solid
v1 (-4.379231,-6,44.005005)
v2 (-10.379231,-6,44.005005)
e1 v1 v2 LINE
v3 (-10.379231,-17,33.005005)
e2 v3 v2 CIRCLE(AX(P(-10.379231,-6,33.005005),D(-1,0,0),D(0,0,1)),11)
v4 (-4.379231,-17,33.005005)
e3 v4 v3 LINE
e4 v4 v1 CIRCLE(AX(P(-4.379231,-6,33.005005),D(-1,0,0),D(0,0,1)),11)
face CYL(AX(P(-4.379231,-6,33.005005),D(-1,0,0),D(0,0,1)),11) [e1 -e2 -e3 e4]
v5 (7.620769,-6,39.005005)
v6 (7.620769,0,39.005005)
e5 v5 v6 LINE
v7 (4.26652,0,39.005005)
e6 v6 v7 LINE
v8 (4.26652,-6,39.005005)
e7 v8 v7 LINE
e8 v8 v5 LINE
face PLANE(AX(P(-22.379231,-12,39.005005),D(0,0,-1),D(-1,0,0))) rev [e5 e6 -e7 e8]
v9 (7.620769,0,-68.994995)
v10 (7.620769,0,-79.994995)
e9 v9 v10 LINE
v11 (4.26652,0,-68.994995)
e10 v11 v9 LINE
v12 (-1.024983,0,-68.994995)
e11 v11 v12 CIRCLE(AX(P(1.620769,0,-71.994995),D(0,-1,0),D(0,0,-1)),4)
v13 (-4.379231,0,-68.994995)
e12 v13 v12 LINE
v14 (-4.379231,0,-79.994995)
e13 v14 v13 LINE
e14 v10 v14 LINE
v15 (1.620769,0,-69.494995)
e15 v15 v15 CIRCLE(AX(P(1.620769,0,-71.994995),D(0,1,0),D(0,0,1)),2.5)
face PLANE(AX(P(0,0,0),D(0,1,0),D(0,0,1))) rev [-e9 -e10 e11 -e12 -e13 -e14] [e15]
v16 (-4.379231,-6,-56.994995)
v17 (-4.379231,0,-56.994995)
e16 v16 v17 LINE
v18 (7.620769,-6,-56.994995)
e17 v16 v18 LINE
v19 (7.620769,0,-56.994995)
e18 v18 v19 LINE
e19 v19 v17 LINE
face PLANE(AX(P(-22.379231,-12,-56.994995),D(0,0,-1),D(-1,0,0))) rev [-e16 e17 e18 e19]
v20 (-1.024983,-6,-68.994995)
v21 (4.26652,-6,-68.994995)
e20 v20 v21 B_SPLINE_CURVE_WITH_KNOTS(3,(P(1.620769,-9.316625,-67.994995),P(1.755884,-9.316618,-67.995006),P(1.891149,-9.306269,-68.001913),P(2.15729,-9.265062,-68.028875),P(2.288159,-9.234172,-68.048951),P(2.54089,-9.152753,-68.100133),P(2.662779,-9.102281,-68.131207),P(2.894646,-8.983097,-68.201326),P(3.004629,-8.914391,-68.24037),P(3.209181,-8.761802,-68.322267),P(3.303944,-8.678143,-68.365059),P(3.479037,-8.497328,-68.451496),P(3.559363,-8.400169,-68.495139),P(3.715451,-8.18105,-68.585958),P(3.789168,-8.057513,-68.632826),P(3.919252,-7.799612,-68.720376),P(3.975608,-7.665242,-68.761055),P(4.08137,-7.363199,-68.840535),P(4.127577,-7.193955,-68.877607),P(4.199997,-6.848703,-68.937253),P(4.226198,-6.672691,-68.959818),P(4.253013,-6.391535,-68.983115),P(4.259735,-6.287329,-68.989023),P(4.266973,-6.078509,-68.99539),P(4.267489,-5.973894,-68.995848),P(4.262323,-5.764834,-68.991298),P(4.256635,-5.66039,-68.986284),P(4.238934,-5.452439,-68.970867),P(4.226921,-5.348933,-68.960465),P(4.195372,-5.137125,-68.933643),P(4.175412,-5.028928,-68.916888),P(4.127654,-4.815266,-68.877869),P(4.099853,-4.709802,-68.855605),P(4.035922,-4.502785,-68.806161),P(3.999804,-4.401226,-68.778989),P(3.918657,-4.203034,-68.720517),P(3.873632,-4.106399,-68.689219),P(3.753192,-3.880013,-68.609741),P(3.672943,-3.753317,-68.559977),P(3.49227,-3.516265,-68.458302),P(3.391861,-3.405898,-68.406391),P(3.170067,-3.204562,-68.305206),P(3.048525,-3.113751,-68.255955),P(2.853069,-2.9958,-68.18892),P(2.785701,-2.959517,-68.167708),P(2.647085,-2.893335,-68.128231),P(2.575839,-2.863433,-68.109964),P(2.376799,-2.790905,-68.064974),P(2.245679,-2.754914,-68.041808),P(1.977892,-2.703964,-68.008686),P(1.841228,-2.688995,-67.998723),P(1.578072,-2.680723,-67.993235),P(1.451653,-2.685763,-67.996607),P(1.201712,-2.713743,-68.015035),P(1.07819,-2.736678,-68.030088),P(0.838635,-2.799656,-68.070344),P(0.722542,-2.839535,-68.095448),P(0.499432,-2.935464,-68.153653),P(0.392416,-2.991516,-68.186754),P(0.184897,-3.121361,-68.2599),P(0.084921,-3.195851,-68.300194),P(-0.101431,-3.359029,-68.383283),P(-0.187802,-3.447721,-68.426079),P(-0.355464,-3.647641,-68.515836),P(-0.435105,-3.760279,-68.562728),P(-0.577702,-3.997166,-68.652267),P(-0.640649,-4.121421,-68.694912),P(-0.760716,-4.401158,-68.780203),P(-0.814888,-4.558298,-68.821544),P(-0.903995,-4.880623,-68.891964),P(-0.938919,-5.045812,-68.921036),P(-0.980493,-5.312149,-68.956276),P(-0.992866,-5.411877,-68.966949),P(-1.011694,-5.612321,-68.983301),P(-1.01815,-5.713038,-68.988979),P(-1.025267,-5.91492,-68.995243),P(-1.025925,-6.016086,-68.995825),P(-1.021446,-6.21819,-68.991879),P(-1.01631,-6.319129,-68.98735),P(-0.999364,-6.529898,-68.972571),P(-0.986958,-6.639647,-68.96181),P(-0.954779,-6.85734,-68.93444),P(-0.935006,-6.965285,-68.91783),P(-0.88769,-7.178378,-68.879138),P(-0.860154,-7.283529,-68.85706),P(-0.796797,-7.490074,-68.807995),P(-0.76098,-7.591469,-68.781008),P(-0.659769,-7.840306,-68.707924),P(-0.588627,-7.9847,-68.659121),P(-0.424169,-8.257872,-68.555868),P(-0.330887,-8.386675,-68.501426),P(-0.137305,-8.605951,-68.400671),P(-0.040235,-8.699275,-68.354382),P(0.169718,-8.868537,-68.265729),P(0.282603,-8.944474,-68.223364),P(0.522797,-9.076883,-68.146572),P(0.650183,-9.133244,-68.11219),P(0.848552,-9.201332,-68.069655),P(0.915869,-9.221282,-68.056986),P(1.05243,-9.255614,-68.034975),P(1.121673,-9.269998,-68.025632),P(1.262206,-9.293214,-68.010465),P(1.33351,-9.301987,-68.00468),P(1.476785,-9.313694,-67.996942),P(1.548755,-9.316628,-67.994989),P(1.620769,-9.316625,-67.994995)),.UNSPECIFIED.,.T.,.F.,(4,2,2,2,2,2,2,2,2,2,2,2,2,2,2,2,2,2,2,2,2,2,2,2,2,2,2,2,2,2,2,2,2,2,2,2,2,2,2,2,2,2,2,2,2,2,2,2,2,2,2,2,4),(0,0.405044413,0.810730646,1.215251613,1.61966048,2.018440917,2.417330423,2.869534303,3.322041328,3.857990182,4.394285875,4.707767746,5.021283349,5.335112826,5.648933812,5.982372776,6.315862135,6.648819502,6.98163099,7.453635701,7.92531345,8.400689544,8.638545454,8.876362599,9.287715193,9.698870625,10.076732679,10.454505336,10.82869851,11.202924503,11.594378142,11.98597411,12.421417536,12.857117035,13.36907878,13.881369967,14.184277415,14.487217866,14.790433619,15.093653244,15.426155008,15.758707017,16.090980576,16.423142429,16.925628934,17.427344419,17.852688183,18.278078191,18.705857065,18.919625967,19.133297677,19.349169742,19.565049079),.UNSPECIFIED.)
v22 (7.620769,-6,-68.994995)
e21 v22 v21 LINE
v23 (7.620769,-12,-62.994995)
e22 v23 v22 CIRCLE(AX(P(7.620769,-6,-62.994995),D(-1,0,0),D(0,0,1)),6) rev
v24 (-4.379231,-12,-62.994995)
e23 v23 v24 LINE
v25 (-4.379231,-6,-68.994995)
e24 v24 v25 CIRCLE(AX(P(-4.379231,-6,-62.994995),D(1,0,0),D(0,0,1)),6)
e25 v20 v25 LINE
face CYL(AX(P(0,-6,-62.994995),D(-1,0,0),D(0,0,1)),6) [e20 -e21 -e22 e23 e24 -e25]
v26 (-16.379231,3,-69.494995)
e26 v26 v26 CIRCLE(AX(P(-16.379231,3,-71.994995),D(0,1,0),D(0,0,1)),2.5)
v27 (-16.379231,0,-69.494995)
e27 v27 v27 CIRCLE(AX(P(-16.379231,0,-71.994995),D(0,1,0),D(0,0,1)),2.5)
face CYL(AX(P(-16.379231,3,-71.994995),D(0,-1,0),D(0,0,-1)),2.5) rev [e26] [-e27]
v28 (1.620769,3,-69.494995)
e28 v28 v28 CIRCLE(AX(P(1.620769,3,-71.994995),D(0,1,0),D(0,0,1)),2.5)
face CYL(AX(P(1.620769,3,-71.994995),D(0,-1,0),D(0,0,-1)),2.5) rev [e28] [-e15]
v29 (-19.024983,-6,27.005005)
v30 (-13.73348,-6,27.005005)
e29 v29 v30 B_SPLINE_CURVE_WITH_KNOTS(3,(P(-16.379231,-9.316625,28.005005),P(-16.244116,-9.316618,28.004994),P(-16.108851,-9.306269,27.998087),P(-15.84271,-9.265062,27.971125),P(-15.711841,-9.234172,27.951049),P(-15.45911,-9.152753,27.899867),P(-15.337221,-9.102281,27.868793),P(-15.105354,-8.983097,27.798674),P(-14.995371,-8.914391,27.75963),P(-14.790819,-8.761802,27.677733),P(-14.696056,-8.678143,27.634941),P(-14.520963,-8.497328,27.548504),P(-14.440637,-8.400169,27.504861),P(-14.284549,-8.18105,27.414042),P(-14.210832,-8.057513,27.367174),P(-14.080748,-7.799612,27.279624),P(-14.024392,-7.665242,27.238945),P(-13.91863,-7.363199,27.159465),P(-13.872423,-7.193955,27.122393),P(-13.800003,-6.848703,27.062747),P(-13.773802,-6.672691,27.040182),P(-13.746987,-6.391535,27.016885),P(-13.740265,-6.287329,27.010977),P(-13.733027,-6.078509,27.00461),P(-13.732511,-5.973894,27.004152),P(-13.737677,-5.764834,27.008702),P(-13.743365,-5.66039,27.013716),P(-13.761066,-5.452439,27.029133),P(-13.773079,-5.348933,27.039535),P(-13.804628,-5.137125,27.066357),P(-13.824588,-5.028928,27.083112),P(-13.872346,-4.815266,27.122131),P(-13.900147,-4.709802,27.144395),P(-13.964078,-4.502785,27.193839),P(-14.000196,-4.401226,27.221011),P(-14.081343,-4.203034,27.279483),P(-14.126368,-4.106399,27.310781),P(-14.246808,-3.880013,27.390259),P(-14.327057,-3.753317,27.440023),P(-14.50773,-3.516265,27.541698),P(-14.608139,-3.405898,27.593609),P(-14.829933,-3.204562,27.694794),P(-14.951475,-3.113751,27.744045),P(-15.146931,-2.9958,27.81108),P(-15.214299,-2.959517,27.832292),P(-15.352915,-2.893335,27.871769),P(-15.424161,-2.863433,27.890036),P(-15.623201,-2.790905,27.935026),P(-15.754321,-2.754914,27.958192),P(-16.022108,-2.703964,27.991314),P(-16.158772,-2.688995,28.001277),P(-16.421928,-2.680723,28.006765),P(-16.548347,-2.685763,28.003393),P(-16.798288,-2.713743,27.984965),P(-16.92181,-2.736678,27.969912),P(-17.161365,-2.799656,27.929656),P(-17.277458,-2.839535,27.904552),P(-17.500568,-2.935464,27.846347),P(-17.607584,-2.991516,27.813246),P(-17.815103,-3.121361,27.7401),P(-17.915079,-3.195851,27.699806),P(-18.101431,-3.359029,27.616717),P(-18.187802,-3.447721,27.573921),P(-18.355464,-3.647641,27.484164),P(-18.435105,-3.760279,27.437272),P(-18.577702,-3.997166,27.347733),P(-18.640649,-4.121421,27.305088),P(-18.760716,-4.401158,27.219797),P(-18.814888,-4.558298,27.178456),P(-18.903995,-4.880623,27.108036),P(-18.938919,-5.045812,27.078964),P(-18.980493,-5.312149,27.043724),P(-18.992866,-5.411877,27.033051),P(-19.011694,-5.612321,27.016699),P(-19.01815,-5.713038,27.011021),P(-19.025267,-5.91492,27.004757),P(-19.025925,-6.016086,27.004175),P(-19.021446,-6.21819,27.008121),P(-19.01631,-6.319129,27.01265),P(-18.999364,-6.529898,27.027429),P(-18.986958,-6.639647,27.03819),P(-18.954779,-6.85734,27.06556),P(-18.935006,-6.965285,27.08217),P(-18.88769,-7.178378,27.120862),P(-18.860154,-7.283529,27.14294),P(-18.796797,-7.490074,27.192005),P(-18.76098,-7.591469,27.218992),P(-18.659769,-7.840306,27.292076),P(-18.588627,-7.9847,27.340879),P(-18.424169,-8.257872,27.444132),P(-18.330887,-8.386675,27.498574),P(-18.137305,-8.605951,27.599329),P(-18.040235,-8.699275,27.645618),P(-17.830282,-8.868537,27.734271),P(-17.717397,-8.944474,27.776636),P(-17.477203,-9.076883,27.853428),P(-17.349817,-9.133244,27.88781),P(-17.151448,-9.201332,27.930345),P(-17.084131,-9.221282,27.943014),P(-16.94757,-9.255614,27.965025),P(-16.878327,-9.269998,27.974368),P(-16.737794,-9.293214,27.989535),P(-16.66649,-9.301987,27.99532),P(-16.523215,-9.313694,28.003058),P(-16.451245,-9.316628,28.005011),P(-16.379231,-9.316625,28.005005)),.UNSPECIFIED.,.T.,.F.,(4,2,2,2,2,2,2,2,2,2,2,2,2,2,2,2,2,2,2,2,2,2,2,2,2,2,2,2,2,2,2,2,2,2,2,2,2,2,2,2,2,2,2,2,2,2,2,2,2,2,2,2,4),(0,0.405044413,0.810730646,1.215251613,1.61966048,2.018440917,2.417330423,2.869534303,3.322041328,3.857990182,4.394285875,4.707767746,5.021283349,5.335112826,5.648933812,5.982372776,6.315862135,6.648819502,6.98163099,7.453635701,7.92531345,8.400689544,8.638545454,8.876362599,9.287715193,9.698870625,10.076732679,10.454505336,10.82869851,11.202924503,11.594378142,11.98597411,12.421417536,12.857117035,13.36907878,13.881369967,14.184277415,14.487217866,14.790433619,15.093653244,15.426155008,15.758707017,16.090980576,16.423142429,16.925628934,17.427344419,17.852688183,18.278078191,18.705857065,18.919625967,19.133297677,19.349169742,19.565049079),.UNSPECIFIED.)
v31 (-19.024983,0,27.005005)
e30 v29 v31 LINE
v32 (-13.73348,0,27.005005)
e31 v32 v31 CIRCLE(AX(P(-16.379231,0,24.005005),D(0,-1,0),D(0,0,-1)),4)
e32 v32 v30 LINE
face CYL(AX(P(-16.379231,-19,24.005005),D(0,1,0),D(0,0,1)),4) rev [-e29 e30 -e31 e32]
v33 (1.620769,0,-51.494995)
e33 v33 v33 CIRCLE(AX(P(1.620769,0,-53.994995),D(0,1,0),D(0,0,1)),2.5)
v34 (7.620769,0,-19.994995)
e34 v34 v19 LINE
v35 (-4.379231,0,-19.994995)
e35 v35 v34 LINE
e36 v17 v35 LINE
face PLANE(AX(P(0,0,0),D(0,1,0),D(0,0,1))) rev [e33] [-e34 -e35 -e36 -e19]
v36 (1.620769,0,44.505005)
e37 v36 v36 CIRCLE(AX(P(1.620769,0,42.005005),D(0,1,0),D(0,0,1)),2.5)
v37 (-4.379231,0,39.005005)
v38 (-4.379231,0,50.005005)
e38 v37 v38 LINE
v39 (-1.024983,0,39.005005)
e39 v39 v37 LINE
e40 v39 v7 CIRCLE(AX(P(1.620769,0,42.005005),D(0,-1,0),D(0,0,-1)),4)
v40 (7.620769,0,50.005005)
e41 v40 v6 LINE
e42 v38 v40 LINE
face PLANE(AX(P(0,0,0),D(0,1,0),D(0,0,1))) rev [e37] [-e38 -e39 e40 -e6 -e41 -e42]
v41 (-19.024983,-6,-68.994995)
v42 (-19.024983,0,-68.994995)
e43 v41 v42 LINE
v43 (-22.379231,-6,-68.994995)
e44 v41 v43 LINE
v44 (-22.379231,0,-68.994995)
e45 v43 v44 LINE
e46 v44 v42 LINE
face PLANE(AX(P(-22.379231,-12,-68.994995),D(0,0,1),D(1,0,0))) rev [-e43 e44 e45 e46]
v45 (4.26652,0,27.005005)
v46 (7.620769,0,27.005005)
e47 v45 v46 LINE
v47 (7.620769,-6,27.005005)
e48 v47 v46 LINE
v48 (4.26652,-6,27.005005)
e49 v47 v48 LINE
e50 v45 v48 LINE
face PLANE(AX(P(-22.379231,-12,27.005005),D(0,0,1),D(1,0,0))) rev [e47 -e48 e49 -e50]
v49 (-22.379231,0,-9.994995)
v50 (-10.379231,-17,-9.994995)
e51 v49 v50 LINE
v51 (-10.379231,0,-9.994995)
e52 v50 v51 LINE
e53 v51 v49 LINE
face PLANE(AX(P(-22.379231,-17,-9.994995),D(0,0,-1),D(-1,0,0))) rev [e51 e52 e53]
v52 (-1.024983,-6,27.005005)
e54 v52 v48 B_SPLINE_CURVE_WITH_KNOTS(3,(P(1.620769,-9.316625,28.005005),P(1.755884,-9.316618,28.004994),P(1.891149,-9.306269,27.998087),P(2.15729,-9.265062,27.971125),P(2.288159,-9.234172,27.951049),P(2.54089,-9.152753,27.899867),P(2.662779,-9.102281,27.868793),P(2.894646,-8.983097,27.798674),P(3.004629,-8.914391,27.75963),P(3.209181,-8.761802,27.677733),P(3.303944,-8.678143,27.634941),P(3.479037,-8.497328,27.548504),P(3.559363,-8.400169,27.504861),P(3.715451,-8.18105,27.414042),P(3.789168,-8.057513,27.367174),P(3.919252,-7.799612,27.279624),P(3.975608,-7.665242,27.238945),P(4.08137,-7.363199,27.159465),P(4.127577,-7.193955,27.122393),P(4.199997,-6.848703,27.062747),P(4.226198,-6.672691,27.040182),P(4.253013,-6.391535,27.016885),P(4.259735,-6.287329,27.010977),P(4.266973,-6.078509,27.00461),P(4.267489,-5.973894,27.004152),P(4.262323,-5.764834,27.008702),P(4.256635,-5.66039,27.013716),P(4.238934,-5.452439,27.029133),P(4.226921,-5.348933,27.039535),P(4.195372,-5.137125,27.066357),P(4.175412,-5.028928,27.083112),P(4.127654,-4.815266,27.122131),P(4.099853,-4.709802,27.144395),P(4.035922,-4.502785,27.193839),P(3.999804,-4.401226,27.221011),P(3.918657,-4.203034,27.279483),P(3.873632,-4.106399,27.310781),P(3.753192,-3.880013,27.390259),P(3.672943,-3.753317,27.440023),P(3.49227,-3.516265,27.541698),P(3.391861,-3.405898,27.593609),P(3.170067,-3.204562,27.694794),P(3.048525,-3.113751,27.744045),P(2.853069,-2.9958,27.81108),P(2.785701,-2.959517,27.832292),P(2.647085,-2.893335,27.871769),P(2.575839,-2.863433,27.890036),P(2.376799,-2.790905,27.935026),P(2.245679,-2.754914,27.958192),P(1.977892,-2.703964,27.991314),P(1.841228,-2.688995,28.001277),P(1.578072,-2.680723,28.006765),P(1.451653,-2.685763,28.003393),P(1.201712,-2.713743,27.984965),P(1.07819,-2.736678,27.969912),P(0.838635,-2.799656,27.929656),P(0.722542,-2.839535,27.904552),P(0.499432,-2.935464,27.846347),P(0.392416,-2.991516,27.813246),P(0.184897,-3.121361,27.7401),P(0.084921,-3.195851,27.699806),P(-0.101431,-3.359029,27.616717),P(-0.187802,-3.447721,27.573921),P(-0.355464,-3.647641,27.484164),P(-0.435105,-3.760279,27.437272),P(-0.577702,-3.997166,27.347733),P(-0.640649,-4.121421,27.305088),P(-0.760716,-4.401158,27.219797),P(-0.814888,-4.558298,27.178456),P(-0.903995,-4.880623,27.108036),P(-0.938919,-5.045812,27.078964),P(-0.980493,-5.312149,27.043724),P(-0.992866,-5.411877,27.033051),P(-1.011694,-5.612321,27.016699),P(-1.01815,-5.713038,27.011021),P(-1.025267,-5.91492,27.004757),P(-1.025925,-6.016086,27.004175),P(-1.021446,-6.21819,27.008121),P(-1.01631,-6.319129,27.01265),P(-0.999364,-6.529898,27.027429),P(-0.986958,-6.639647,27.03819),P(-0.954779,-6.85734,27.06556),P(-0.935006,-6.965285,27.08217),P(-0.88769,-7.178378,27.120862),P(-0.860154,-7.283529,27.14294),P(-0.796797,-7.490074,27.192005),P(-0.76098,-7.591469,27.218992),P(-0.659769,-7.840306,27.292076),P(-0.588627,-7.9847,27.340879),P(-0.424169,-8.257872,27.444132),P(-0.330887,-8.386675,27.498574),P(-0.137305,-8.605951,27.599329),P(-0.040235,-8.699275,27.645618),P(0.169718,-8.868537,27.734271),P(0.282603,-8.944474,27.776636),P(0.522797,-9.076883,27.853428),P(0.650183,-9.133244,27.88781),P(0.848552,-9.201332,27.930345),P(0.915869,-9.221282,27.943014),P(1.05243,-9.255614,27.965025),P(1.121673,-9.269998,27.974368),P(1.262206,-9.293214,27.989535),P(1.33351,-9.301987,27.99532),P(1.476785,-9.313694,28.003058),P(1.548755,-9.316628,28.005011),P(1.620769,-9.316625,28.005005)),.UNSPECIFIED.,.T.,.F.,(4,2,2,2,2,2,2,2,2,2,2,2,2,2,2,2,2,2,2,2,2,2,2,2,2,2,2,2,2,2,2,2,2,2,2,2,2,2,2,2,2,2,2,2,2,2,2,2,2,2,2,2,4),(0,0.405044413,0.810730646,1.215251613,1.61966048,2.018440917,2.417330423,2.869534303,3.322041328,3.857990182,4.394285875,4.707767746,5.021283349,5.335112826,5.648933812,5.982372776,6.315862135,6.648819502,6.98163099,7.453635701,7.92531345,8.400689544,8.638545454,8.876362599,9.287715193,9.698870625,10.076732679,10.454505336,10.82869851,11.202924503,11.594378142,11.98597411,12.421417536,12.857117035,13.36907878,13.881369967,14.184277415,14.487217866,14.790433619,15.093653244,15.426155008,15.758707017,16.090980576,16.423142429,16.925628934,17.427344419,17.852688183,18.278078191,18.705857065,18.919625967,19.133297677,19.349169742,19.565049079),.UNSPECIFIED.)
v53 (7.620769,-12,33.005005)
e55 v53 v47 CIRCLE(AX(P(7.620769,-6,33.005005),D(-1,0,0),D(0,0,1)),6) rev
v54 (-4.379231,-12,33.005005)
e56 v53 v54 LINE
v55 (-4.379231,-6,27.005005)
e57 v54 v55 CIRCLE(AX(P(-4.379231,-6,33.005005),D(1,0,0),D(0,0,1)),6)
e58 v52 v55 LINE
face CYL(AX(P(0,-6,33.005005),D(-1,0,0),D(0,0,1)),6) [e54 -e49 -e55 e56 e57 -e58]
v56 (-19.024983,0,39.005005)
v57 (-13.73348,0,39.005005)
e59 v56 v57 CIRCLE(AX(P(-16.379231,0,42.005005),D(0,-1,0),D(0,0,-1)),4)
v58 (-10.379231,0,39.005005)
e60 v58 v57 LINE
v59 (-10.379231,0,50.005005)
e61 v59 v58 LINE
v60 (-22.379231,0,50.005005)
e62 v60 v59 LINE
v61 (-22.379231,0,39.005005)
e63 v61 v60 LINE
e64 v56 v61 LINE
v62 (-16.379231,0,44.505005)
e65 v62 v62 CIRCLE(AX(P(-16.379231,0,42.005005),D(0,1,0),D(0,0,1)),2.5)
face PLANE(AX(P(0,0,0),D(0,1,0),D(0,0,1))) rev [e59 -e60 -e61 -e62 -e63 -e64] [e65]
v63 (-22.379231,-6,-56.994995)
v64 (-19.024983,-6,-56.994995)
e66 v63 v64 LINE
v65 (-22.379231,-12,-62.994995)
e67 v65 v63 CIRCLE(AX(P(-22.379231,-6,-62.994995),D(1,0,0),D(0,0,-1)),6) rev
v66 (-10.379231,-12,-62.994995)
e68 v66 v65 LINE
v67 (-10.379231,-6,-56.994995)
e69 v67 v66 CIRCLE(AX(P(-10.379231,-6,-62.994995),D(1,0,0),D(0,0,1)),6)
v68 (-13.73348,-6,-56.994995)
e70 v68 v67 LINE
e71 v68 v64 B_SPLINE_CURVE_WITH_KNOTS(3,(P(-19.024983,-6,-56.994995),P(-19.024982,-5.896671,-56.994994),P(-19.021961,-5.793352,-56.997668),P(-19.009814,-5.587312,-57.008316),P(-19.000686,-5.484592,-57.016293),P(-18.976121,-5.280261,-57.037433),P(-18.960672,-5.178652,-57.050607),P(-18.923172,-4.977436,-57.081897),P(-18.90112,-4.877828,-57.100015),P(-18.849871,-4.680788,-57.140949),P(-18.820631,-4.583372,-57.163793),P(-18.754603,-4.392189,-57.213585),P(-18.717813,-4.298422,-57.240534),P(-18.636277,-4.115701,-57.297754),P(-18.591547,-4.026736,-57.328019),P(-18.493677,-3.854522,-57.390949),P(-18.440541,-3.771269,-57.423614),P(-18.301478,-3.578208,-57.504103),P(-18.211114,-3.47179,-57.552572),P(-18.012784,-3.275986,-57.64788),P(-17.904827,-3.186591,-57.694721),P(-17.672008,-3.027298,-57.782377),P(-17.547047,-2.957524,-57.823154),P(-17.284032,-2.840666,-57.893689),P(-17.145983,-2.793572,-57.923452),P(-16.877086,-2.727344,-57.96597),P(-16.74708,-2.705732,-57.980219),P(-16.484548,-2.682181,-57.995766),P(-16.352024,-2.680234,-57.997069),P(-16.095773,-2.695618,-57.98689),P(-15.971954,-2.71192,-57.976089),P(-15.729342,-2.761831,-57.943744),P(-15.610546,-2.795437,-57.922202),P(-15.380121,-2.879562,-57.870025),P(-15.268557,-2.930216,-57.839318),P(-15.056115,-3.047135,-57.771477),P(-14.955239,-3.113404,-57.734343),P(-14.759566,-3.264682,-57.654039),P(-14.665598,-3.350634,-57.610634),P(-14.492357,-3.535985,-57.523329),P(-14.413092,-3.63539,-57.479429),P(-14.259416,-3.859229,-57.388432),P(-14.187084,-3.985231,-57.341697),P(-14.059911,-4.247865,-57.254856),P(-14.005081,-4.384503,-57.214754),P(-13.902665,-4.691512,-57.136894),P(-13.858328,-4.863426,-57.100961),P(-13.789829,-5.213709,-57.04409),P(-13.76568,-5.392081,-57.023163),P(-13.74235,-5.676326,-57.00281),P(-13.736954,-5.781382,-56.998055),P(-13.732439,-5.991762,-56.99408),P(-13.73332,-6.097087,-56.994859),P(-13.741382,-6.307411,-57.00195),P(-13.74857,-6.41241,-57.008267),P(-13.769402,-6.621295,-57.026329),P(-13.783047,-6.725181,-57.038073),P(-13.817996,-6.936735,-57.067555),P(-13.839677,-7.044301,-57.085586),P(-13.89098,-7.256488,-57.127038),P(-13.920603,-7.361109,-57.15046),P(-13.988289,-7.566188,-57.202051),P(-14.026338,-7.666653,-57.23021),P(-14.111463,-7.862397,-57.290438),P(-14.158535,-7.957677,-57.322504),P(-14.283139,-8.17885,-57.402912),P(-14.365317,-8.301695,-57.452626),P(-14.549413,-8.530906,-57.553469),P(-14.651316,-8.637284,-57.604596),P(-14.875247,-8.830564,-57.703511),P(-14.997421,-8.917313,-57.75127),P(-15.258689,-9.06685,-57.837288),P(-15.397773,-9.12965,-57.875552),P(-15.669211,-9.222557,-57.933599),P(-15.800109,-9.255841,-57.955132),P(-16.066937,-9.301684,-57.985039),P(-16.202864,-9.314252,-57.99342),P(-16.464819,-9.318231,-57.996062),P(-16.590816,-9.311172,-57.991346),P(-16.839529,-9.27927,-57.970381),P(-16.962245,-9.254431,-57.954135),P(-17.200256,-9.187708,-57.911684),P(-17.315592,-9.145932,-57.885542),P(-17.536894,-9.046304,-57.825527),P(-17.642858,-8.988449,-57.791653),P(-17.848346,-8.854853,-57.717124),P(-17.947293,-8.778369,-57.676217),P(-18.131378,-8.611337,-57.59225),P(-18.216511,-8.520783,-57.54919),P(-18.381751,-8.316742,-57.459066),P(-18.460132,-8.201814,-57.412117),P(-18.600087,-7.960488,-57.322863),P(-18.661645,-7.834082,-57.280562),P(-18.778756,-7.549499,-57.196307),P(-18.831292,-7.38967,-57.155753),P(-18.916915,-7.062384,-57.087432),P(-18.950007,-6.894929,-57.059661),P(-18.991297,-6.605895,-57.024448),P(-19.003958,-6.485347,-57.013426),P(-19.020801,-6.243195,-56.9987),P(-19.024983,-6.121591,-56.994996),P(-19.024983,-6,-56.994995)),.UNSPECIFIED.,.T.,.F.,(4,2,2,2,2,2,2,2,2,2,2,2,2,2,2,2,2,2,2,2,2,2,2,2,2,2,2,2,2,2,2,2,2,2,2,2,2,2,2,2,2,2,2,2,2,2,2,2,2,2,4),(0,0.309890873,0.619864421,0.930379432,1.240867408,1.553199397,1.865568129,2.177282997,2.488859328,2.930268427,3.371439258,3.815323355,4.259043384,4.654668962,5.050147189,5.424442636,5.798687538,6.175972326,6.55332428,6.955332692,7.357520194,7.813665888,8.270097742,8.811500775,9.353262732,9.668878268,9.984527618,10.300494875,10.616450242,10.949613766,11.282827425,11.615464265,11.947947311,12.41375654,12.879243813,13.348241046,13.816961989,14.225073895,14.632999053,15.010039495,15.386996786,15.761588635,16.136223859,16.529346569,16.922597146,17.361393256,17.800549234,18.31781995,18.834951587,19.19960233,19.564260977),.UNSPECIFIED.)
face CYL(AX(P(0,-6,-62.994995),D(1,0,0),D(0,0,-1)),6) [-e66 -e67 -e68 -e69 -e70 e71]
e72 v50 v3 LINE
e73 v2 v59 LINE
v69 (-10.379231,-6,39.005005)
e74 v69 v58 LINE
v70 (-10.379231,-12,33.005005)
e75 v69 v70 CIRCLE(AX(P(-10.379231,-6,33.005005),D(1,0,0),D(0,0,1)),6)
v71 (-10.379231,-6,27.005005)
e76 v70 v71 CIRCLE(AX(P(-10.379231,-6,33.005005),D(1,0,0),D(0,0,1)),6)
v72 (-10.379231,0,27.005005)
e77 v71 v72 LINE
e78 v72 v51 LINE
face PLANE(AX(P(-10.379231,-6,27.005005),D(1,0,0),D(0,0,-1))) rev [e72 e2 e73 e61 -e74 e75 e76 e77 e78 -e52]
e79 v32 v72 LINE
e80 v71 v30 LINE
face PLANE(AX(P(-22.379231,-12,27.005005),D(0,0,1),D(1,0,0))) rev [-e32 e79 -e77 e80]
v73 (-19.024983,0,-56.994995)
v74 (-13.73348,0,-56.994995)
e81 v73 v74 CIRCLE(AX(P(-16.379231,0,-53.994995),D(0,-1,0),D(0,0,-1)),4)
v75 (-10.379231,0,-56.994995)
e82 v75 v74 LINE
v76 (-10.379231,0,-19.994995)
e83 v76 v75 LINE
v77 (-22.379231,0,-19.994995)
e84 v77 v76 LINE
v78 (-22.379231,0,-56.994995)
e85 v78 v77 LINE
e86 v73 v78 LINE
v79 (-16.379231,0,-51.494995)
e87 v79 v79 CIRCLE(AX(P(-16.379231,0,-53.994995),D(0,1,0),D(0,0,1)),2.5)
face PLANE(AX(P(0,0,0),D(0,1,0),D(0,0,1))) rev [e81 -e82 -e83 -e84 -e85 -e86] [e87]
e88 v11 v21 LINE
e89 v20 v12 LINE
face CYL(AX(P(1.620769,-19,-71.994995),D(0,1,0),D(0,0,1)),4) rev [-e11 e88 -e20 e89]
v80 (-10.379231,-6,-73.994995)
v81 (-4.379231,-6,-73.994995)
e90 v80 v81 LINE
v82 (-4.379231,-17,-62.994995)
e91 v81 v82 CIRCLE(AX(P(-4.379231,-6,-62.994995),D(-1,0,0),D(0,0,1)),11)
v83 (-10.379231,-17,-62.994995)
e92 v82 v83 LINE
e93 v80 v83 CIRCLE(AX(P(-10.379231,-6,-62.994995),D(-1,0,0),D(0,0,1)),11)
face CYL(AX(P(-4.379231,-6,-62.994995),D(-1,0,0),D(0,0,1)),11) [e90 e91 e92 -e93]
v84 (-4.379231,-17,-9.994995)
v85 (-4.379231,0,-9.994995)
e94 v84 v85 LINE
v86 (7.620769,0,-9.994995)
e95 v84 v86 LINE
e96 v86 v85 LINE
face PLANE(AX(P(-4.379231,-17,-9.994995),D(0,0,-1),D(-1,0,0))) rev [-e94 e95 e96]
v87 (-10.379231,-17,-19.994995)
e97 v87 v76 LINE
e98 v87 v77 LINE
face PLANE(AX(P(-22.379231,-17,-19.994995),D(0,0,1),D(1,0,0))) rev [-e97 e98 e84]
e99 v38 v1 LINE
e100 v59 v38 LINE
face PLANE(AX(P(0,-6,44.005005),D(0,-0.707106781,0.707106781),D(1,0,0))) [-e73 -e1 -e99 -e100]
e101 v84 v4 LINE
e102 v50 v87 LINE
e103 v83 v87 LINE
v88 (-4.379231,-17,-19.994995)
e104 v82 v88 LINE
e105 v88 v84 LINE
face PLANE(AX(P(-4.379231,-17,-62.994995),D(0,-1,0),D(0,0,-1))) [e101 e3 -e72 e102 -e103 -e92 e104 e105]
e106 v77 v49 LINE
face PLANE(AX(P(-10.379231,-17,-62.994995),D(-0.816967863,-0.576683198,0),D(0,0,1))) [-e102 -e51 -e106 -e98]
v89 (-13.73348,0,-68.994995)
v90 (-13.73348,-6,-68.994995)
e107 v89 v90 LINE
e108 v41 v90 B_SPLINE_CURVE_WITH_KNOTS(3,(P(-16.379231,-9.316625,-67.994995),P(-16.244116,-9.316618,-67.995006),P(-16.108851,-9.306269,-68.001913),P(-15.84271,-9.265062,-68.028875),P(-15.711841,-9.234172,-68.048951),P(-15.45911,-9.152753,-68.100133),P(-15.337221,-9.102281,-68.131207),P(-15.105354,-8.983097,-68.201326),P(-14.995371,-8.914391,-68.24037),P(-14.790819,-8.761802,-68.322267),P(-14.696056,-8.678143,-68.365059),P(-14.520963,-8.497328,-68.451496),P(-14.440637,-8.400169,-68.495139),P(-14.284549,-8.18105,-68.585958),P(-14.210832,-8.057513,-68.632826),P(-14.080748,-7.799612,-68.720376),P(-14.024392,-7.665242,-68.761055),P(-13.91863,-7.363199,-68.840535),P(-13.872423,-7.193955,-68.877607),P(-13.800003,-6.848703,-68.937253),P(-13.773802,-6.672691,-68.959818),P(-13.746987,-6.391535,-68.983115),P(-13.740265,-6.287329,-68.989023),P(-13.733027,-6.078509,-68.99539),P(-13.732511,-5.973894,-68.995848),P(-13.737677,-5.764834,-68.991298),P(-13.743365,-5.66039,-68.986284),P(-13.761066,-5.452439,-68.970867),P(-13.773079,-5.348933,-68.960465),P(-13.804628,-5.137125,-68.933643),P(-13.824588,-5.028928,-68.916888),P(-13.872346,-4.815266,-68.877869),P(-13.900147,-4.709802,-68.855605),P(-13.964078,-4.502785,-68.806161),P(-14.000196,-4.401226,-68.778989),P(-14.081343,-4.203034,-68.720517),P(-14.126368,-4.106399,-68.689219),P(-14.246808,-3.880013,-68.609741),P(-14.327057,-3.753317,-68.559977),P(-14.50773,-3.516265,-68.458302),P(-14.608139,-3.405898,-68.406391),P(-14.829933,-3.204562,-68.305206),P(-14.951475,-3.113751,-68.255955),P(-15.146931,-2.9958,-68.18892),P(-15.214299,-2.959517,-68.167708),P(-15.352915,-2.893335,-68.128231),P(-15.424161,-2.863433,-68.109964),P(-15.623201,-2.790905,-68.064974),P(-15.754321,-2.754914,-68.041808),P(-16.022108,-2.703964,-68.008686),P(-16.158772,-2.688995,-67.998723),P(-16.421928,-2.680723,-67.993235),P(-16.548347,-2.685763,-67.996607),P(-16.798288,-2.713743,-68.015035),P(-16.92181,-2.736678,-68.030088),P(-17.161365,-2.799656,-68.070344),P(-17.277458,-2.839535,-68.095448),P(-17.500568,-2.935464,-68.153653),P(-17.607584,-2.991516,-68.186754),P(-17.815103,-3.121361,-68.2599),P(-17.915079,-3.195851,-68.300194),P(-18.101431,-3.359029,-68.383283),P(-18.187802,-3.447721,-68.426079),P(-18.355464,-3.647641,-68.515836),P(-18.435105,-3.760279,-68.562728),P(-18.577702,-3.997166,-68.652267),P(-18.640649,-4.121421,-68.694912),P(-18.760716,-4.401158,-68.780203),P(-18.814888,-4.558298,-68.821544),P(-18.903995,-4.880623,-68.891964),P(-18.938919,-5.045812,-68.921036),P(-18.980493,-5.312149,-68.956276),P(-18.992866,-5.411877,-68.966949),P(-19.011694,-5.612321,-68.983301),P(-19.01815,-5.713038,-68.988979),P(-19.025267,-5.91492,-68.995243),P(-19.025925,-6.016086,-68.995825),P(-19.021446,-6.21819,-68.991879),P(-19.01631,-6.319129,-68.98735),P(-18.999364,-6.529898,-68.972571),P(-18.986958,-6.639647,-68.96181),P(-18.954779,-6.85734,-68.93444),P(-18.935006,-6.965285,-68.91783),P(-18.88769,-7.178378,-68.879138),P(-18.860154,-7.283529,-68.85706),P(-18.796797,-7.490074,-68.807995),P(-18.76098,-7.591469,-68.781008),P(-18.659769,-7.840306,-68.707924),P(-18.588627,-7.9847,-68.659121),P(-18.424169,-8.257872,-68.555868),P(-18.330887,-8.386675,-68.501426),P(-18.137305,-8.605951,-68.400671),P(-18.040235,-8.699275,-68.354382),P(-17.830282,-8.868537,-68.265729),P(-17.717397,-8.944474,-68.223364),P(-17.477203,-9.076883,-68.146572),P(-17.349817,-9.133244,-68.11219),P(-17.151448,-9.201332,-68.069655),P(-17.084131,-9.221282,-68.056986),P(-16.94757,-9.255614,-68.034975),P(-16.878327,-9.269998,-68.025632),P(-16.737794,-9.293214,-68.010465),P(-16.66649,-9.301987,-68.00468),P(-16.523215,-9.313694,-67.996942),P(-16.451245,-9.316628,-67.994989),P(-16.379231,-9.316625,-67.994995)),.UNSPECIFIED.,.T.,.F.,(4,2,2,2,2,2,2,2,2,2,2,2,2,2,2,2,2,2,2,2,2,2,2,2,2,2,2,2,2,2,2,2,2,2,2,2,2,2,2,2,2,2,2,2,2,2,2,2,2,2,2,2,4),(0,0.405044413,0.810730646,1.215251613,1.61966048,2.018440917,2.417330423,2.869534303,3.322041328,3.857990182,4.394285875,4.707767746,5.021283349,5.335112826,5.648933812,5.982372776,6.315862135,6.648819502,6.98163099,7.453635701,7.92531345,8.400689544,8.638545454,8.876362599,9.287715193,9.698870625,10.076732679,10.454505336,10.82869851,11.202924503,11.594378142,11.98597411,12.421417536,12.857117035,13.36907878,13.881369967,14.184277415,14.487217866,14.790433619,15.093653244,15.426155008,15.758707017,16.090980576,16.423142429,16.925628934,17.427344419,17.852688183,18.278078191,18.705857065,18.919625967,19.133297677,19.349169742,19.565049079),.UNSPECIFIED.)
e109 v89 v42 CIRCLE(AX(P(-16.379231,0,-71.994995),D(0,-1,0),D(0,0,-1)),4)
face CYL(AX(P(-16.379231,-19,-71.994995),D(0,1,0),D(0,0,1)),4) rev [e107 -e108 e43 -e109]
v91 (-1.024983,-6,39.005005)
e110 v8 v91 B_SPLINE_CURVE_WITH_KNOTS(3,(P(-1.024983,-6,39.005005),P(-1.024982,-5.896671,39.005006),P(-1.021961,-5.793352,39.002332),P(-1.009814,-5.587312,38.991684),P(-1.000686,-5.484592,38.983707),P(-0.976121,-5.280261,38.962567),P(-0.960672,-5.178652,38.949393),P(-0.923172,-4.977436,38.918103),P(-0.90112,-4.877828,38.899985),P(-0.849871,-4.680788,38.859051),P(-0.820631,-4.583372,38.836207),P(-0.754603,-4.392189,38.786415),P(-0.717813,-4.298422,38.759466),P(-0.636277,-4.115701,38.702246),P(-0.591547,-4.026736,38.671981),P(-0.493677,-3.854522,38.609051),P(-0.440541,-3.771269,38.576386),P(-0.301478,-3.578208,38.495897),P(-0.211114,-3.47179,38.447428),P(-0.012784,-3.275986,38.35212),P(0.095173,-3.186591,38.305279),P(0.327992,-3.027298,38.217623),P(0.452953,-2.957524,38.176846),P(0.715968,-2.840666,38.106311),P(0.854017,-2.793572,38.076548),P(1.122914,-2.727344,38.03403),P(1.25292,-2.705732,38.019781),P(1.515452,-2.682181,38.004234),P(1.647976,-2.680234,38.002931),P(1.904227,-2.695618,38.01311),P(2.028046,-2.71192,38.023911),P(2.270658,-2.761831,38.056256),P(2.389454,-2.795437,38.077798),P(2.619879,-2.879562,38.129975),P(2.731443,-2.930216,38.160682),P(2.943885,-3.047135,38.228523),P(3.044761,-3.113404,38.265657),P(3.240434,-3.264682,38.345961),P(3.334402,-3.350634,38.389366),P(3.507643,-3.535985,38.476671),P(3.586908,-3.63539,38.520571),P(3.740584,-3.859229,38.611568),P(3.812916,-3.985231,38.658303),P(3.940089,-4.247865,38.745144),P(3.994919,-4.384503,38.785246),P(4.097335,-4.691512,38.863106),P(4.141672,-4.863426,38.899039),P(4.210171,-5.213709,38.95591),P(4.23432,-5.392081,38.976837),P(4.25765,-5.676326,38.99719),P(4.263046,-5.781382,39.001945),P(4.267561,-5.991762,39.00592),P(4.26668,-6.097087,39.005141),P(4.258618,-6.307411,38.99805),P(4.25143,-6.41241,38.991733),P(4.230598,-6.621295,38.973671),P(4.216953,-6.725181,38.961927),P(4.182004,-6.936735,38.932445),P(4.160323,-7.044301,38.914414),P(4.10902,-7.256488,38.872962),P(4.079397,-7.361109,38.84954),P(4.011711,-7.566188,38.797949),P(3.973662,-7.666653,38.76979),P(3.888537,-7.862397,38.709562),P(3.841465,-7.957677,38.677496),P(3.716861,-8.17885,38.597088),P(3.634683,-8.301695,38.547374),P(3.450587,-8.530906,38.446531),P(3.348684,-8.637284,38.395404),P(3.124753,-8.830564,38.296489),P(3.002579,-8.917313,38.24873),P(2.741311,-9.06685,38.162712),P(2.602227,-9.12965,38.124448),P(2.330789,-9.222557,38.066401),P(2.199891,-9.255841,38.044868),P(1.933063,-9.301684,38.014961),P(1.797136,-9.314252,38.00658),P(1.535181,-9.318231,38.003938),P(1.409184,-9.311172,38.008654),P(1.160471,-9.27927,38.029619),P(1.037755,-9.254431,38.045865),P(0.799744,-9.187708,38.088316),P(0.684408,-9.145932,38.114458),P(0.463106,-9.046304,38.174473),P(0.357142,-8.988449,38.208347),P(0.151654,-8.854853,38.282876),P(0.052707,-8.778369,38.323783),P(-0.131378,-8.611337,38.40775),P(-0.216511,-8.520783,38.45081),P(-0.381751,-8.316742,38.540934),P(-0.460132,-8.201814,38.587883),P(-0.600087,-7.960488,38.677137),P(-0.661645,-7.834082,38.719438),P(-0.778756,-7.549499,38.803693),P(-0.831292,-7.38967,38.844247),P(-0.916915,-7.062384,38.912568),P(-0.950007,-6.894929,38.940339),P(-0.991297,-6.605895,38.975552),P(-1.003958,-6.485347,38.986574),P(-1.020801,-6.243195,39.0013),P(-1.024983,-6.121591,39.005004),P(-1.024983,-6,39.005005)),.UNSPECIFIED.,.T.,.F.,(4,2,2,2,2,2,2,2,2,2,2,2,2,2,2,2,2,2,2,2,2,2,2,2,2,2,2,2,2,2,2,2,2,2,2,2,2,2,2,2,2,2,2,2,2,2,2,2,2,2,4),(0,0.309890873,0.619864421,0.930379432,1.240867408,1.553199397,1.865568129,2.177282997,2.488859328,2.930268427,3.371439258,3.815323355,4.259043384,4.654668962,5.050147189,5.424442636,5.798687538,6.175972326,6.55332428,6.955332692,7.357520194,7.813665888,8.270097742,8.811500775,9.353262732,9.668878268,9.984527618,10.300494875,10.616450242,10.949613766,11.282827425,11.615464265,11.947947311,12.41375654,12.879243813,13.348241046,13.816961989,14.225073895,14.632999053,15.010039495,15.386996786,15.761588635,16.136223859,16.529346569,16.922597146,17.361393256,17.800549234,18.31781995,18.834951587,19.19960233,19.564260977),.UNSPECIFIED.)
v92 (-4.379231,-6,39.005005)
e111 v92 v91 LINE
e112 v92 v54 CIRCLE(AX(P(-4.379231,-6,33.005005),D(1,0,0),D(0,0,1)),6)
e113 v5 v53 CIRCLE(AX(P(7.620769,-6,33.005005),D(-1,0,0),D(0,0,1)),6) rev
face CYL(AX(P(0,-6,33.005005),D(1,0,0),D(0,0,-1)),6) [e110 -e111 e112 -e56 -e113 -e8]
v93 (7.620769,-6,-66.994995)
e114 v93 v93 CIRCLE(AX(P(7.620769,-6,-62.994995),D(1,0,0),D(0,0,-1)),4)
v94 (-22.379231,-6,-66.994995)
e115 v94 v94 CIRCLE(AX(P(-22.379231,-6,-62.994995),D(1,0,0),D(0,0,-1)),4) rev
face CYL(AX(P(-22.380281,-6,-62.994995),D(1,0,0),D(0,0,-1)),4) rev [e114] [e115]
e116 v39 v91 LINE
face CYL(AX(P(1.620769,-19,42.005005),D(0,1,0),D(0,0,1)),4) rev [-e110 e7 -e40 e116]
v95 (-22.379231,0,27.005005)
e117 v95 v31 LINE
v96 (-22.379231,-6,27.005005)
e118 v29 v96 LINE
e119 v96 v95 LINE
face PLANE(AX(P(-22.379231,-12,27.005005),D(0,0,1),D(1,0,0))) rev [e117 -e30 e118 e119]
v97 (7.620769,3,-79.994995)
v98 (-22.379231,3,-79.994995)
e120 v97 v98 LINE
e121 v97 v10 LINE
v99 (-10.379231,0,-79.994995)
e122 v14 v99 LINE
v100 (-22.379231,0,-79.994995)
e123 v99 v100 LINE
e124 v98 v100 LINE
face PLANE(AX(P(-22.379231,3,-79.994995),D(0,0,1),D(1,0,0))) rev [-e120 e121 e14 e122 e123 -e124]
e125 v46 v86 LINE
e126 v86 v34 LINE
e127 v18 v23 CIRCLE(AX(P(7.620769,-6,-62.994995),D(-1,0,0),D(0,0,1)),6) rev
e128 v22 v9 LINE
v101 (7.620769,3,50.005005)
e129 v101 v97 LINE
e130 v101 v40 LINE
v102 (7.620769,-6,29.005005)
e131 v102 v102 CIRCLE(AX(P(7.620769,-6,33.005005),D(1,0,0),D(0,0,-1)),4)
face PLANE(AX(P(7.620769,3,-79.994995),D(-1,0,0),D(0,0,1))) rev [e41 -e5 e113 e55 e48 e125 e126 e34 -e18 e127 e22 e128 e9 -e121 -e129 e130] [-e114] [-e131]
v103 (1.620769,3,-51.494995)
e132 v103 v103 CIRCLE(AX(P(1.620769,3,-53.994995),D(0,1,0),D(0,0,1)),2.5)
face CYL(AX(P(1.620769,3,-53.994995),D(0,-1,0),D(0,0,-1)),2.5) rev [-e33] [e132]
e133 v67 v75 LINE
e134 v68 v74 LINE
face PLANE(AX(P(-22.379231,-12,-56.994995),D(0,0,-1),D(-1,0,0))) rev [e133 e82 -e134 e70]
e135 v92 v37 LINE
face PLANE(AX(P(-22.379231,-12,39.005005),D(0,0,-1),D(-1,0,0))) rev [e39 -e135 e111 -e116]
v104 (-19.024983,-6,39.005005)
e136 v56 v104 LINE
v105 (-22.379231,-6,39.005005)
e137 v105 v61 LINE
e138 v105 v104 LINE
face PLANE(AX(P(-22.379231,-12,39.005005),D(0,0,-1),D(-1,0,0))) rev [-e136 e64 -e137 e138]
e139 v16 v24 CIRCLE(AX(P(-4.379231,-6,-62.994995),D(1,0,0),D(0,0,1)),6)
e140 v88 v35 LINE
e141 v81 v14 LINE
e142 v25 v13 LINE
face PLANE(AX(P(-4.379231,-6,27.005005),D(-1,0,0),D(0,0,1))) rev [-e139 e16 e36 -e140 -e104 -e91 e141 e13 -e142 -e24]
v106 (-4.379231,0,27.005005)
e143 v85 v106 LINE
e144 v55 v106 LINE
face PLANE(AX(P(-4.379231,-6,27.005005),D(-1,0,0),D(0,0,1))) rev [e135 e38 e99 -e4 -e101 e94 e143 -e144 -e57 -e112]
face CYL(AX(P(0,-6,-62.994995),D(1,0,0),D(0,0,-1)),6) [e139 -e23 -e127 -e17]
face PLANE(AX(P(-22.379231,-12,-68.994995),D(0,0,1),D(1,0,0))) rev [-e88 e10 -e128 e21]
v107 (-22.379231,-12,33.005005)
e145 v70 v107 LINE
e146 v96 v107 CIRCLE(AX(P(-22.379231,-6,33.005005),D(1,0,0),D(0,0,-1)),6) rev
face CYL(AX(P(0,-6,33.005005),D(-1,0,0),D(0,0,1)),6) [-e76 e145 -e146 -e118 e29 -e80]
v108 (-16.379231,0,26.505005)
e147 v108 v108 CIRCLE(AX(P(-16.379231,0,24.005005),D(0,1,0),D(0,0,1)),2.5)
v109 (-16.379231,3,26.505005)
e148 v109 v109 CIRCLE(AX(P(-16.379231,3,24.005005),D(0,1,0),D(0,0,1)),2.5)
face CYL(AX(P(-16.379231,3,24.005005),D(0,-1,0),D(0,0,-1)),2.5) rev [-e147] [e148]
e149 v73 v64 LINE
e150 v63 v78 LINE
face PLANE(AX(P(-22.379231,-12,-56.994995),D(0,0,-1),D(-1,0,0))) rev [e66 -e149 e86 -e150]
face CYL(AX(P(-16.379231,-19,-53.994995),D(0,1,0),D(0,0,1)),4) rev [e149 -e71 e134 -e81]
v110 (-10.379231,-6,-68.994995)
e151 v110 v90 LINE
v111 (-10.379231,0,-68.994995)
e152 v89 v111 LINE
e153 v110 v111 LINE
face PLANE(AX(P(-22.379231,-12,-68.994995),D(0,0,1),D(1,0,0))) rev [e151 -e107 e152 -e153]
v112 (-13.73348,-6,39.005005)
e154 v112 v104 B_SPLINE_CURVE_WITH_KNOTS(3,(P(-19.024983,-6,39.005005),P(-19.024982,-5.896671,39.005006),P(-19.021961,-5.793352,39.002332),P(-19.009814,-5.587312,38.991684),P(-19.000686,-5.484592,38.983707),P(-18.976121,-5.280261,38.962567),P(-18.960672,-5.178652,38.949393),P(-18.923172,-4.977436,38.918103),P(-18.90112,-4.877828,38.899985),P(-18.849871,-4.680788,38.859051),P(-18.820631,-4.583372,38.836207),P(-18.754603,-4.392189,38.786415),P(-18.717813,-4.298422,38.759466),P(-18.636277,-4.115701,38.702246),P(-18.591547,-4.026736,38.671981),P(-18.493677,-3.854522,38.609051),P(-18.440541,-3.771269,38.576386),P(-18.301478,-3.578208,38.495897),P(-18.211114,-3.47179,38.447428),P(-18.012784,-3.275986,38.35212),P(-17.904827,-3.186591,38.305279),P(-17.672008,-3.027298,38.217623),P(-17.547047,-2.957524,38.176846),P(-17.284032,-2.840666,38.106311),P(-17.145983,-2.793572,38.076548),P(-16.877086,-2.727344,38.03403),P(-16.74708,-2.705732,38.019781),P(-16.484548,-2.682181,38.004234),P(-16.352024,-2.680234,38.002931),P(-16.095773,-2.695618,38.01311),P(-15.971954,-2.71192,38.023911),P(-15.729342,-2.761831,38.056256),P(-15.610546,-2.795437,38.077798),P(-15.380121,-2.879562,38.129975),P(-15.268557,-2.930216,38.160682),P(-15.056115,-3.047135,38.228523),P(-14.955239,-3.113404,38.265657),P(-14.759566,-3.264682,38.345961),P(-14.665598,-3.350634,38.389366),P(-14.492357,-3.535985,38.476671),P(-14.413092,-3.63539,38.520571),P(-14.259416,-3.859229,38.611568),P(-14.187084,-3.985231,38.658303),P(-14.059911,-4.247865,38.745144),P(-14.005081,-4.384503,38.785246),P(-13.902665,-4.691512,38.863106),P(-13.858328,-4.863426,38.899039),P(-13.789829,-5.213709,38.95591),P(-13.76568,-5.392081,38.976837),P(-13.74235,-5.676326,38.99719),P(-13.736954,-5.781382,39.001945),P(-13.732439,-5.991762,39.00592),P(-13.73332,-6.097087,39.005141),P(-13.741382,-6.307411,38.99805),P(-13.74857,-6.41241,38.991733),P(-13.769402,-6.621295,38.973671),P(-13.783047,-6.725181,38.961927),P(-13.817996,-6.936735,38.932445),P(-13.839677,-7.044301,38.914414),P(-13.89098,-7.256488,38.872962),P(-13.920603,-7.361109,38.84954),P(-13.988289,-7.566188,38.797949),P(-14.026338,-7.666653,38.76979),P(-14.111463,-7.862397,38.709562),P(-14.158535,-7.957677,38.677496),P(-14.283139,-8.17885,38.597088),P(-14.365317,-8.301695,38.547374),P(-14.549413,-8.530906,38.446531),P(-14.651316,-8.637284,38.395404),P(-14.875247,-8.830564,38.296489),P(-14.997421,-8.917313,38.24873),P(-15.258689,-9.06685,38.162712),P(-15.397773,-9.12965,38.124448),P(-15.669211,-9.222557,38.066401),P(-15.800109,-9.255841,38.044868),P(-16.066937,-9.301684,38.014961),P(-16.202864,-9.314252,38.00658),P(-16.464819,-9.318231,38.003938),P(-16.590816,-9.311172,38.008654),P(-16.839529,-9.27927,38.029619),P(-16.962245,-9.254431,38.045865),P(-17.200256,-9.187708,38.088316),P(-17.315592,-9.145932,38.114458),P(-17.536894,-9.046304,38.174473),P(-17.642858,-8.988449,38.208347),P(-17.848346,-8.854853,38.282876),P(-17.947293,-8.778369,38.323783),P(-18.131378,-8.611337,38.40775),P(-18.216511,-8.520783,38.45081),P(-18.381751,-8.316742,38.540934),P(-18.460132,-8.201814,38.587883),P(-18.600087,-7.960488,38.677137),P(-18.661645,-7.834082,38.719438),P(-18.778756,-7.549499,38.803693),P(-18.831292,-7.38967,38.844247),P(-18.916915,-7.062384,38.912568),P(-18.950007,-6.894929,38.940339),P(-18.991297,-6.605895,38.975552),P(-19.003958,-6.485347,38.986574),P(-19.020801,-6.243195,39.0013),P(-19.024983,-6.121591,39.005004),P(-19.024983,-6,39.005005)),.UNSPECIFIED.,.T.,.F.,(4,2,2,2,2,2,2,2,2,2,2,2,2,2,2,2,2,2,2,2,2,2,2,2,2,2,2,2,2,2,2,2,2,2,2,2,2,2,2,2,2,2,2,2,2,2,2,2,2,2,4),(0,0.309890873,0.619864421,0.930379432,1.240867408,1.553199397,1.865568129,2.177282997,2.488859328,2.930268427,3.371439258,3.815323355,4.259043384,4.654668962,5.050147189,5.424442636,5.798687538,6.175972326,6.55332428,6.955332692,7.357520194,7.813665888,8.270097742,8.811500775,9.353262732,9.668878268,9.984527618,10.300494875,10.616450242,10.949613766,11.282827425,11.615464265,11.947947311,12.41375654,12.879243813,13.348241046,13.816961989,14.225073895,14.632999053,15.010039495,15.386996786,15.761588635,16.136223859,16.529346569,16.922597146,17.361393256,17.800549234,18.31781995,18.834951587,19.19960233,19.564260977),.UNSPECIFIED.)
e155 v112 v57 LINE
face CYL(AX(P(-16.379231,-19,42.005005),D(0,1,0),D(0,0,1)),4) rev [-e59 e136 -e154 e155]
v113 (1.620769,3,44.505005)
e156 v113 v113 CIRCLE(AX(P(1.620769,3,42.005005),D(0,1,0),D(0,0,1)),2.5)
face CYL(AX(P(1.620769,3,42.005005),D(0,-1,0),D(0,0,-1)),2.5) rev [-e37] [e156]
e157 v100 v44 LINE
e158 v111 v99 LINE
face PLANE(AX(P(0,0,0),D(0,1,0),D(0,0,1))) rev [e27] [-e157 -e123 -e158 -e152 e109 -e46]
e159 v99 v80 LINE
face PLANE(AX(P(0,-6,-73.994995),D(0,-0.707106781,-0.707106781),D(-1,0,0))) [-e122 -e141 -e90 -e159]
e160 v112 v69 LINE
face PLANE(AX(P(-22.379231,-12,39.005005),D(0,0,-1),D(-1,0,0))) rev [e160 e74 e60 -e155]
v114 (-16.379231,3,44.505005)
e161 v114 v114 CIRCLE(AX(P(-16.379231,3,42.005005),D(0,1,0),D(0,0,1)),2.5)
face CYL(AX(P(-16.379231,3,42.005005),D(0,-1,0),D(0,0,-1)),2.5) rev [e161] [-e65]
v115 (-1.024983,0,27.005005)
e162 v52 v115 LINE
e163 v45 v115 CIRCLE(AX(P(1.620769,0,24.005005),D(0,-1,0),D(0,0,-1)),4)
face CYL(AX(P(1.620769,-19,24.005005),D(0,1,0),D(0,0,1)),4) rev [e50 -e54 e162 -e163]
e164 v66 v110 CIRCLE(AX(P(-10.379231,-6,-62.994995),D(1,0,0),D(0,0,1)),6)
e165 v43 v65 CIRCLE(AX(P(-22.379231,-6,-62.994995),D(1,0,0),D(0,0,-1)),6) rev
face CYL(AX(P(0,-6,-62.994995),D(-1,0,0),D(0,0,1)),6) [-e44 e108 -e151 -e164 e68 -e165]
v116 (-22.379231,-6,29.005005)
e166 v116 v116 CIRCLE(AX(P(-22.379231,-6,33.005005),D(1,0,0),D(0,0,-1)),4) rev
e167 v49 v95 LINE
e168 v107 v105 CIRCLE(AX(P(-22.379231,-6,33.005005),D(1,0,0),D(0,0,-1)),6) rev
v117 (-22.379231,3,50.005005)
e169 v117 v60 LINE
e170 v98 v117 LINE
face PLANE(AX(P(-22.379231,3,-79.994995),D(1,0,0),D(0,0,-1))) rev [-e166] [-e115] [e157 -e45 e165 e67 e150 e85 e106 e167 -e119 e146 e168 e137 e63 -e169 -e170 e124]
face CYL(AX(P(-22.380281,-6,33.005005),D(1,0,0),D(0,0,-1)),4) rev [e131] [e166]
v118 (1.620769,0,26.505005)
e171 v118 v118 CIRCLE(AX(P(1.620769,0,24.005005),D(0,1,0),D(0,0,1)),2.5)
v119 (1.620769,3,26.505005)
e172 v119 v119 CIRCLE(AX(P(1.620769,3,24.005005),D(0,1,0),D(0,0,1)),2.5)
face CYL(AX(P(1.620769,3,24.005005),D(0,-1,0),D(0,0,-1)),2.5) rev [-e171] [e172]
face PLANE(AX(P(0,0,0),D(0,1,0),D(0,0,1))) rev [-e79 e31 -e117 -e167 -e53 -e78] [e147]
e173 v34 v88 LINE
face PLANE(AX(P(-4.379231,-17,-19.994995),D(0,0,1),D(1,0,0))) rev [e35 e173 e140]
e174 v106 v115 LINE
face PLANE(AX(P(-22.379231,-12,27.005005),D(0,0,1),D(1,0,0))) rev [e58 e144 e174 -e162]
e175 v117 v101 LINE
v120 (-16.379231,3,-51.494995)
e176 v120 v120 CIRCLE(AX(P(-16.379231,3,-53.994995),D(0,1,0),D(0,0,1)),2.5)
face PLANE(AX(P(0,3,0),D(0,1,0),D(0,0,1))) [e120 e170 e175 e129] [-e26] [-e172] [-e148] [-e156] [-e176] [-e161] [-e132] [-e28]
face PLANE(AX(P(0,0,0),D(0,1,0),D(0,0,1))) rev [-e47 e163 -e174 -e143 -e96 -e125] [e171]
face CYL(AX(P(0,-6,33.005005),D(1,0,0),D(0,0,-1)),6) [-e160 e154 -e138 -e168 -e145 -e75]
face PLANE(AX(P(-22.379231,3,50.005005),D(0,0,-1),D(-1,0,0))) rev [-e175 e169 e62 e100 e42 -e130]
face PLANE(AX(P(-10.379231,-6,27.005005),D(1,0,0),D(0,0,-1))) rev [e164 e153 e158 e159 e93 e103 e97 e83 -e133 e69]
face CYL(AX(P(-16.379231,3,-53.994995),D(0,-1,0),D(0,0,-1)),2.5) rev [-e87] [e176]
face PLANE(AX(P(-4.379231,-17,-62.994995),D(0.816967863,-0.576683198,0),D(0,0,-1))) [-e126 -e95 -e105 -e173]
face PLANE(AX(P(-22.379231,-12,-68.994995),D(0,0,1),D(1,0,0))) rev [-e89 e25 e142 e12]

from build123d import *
from OCP.BRepFilletAPI import BRepFilletAPI_MakeChamfer

# Parameters (mm, degrees)
SKETCH1_W           = 30
SKETCH1_H           = 130
SKETCH1_R           = 2.5
BOSS_EXTRUDE1_DEPTH = 3
SKETCH2_W           = 30
SKETCH2_H           = 12
BOSS_EXTRUDE2_DEPTH = 12
CUT_EXTRUDE1_REACH  = 88.274
SKETCH3_R           = 4
FILLET1_R           = 6
SKETCH4_R           = 4
CUT_EXTRUDE2_DEPTH  = 19
SKETCH5_W           = 6
SKETCH5_H           = 84
SKETCH5_H_2         = 11
BOSS_EXTRUDE3_DEPTH = 6
CHAMFER1_SIZE       = 6
BOSS_EXTRUDE4_DEPTH = 6
SKETCH7_W           = 12
SKETCH7_H           = 10
BOSS_EXTRUDE5_DEPTH = 17
CHAMFER2_SIZE       = 17
CHAMFER2_SIZE2      = 12


with BuildPart() as part:
    # Sketch1 → Boss-Extrude1 (new body)
    with BuildSketch(Plane(origin=(0, 0, 0), x_dir=(1, 0, 0), z_dir=(0, 1, 0))):
        with Locations((-7.37923135, 14.994995261)):
            Rectangle(SKETCH1_W, SKETCH1_H)
        with Locations(Location((-16.37923135, -24.005004739, 0), (0, 0, 270))):
            Circle(SKETCH1_R, mode=Mode.SUBTRACT)
        with Locations(Location((1.62076865, -24.005004739, 0), (0, 0, 270))):
            Circle(SKETCH1_R, mode=Mode.SUBTRACT)
        with Locations(Location((1.62076865, -42.005004739, 0), (0, 0, 270))):
            Circle(SKETCH1_R, mode=Mode.SUBTRACT)
        with Locations(Location((-16.37923135, -42.005004739, 0), (0, 0, 270))):
            Circle(SKETCH1_R, mode=Mode.SUBTRACT)
        with Locations(Location((-16.37923135, 71.994995261, 0), (0, 0, 270))):
            Circle(SKETCH1_R, mode=Mode.SUBTRACT)
        with Locations(Location((-16.37923135, 53.994995261, 0), (0, 0, 270))):
            Circle(SKETCH1_R, mode=Mode.SUBTRACT)
        with Locations(Location((1.62076865, 71.994995261, 0), (0, 0, 270))):
            Circle(SKETCH1_R, mode=Mode.SUBTRACT)
        with Locations(Location((1.62076865, 53.994995261, 0), (0, 0, 270))):
            Circle(SKETCH1_R, mode=Mode.SUBTRACT)
    extrude(amount=BOSS_EXTRUDE1_DEPTH)

    # Sketch2 → Boss-Extrude2 (add)
    with BuildSketch(Plane.XZ):
        with Locations((-7.37923135, -62.994995261)):
            Rectangle(SKETCH2_W, SKETCH2_H)
        with Locations((-7.37923135, 33.005004739)):
            Rectangle(SKETCH2_W, SKETCH2_H)
    extrude(amount=BOSS_EXTRUDE2_DEPTH)

    # Sketch3 → Cut-Extrude1 (cut, up to next)
    with BuildSketch(Plane(origin=(7.62076865, 0, 0), x_dir=(0, 0, -1), z_dir=(1, 0, 0)), mode=Mode.PRIVATE) as cut_extrude1_sk1:
        with Locations((-33.005004739, -6)):
            Circle(SKETCH3_R)
    cut_extrude1_tool1 = extrude(cut_extrude1_sk1.sketch, amount=-CUT_EXTRUDE1_REACH, mode=Mode.PRIVATE) & part.part
    # Sketch3 → Cut-Extrude1 (cut, up to next)
    with BuildSketch(Plane(origin=(7.62076865, 0, 0), x_dir=(0, 0, -1), z_dir=(1, 0, 0)), mode=Mode.PRIVATE) as cut_extrude1_sk2:
        with Locations((62.994995261, -6)):
            Circle(SKETCH3_R)
    cut_extrude1_tool2 = extrude(cut_extrude1_sk2.sketch, amount=-CUT_EXTRUDE1_REACH, mode=Mode.PRIVATE) & part.part
    add(cut_extrude1_tool1.solids().sort_by_distance((7.620769, -6, 33.005005))[0], mode=Mode.SUBTRACT)
    add(cut_extrude1_tool2.solids().sort_by_distance((7.620769, -6, -62.994995))[0], mode=Mode.SUBTRACT)

    # Fillet1
    fillet1_edges = [part.edges().sort_by_distance(p)[0] for p in [
        (-7.37923135, -12, -68.994995261),
        (-7.37923135, -12, -56.994995261),
        (-7.37923135, -12, 27.005004739),
        (-7.37923135, -12, 39.005004739),
    ]]
    fillet(fillet1_edges, radius=FILLET1_R - 0.0001)  # a hair under: the kernel refuses the full size

    # Sketch4 → Cut-Extrude2 (cut)
    with BuildSketch(Plane.XZ):
        with Locations((-16.37923135, -53.994995261)):
            Circle(SKETCH4_R)
        with Locations((-16.37923135, -71.994995261)):
            Circle(SKETCH4_R)
        with Locations((1.62076865, -71.994995261)):
            Circle(SKETCH4_R)
        with Locations((1.62076865, -3.994995261)):
            Circle(SKETCH4_R)
        with Locations((1.62076865, 24.005004739)):
            Circle(SKETCH4_R)
        with Locations((-16.37923135, 24.005004739)):
            Circle(SKETCH4_R)
        with Locations((-16.37923135, 42.005004739)):
            Circle(SKETCH4_R)
        with Locations((1.62076865, 42.005004739)):
            Circle(SKETCH4_R)
    extrude(amount=CUT_EXTRUDE2_DEPTH, mode=Mode.SUBTRACT)

    # Sketch5 → Boss-Extrude3 (add)
    with BuildSketch(Plane.XZ):
        with Locations((-7.37923135, -14.994995261)):
            Rectangle(SKETCH5_W, SKETCH5_H)
        with Locations((-7.37923135, -74.494995261)):
            Rectangle(SKETCH5_W, SKETCH5_H_2)
        with Locations((-7.37923135, 44.505004739)):
            Rectangle(SKETCH5_W, SKETCH5_H_2)
    extrude(amount=BOSS_EXTRUDE3_DEPTH)

    # Chamfer1
    chamfer1_edges = [part.edges().sort_by_distance(p)[0] for p in [
        (-7.37923135, -6, -79.994995261),
        (-7.37923135, -6, 50.005004739),
    ]]
    chamfer(chamfer1_edges, length=CHAMFER1_SIZE)

    # Sketch6 → Boss-Extrude4 (add)
    with BuildSketch(Plane.ZY.offset(10.37923135)):
        with BuildLine():
            Line((-62.994995261, -17), (33.005004739, -17))
            ThreePointArc((33.005004739, -17), (40.783179332, -13.778174593), (44.005004739, -6))
            Line((44.005004739, -6), (39.005004739, -6))
            ThreePointArc((39.005004739, -6), (33.005004739, -12), (27.005004739, -6))
            Line((27.005004739, -6), (-56.994995261, -6))
            ThreePointArc((-56.994995261, -6), (-62.994995261, -12), (-68.994995261, -6))
            Line((-68.994995261, -6), (-73.994995261, -6))
            ThreePointArc((-73.994995261, -6), (-70.773169854, -13.778174593), (-62.994995261, -17))
        make_face()
    extrude(amount=-BOSS_EXTRUDE4_DEPTH)

    # Sketch7 → Boss-Extrude5 (add)
    with BuildSketch(Plane.XZ):
        with Locations((-16.37923135, -14.994995261)):
            Rectangle(SKETCH7_W, SKETCH7_H)
        with Locations((1.62076865, -14.994995261)):
            Rectangle(SKETCH7_W, SKETCH7_H)
    extrude(amount=BOSS_EXTRUDE5_DEPTH)

    # Chamfer2: one chamfer whose edges measure the first distance from different faces: ONE call of the kernel's chamfer builder (chamfer() names one face for all edges)
    chamfer2_edges_1 = [part.edges().sort_by_distance(p)[0] for p in [
        (-22.37923135, -17, -14.994995261),
    ]]
    chamfer2_side_1 = [part.faces().sort_by_distance(p)[0] for p in [
        (-22.37923135, -2.310192331, -14.994995261),
    ]]
    chamfer2_edges_2 = [part.edges().sort_by_distance(p)[0] for p in [
        (7.62076865, -17, -14.994995261),
    ]]
    chamfer2_side_2 = [part.faces().sort_by_distance(p)[0] for p in [
        (7.62076865, -2.310192331, -14.994995261),
    ]]
    chamfer2 = BRepFilletAPI_MakeChamfer(part.part.solid().wrapped)
    for e in chamfer2_edges_1:
        chamfer2.Add(CHAMFER2_SIZE, CHAMFER2_SIZE2, e.wrapped, chamfer2_side_1[0].wrapped)  # the first distance lies on this face
    for e in chamfer2_edges_2:
        chamfer2.Add(CHAMFER2_SIZE, CHAMFER2_SIZE2, e.wrapped, chamfer2_side_2[0].wrapped)  # the first distance lies on this face
    add(Compound.cast(chamfer2.Shape()), mode=Mode.REPLACE)


solid = part.part
